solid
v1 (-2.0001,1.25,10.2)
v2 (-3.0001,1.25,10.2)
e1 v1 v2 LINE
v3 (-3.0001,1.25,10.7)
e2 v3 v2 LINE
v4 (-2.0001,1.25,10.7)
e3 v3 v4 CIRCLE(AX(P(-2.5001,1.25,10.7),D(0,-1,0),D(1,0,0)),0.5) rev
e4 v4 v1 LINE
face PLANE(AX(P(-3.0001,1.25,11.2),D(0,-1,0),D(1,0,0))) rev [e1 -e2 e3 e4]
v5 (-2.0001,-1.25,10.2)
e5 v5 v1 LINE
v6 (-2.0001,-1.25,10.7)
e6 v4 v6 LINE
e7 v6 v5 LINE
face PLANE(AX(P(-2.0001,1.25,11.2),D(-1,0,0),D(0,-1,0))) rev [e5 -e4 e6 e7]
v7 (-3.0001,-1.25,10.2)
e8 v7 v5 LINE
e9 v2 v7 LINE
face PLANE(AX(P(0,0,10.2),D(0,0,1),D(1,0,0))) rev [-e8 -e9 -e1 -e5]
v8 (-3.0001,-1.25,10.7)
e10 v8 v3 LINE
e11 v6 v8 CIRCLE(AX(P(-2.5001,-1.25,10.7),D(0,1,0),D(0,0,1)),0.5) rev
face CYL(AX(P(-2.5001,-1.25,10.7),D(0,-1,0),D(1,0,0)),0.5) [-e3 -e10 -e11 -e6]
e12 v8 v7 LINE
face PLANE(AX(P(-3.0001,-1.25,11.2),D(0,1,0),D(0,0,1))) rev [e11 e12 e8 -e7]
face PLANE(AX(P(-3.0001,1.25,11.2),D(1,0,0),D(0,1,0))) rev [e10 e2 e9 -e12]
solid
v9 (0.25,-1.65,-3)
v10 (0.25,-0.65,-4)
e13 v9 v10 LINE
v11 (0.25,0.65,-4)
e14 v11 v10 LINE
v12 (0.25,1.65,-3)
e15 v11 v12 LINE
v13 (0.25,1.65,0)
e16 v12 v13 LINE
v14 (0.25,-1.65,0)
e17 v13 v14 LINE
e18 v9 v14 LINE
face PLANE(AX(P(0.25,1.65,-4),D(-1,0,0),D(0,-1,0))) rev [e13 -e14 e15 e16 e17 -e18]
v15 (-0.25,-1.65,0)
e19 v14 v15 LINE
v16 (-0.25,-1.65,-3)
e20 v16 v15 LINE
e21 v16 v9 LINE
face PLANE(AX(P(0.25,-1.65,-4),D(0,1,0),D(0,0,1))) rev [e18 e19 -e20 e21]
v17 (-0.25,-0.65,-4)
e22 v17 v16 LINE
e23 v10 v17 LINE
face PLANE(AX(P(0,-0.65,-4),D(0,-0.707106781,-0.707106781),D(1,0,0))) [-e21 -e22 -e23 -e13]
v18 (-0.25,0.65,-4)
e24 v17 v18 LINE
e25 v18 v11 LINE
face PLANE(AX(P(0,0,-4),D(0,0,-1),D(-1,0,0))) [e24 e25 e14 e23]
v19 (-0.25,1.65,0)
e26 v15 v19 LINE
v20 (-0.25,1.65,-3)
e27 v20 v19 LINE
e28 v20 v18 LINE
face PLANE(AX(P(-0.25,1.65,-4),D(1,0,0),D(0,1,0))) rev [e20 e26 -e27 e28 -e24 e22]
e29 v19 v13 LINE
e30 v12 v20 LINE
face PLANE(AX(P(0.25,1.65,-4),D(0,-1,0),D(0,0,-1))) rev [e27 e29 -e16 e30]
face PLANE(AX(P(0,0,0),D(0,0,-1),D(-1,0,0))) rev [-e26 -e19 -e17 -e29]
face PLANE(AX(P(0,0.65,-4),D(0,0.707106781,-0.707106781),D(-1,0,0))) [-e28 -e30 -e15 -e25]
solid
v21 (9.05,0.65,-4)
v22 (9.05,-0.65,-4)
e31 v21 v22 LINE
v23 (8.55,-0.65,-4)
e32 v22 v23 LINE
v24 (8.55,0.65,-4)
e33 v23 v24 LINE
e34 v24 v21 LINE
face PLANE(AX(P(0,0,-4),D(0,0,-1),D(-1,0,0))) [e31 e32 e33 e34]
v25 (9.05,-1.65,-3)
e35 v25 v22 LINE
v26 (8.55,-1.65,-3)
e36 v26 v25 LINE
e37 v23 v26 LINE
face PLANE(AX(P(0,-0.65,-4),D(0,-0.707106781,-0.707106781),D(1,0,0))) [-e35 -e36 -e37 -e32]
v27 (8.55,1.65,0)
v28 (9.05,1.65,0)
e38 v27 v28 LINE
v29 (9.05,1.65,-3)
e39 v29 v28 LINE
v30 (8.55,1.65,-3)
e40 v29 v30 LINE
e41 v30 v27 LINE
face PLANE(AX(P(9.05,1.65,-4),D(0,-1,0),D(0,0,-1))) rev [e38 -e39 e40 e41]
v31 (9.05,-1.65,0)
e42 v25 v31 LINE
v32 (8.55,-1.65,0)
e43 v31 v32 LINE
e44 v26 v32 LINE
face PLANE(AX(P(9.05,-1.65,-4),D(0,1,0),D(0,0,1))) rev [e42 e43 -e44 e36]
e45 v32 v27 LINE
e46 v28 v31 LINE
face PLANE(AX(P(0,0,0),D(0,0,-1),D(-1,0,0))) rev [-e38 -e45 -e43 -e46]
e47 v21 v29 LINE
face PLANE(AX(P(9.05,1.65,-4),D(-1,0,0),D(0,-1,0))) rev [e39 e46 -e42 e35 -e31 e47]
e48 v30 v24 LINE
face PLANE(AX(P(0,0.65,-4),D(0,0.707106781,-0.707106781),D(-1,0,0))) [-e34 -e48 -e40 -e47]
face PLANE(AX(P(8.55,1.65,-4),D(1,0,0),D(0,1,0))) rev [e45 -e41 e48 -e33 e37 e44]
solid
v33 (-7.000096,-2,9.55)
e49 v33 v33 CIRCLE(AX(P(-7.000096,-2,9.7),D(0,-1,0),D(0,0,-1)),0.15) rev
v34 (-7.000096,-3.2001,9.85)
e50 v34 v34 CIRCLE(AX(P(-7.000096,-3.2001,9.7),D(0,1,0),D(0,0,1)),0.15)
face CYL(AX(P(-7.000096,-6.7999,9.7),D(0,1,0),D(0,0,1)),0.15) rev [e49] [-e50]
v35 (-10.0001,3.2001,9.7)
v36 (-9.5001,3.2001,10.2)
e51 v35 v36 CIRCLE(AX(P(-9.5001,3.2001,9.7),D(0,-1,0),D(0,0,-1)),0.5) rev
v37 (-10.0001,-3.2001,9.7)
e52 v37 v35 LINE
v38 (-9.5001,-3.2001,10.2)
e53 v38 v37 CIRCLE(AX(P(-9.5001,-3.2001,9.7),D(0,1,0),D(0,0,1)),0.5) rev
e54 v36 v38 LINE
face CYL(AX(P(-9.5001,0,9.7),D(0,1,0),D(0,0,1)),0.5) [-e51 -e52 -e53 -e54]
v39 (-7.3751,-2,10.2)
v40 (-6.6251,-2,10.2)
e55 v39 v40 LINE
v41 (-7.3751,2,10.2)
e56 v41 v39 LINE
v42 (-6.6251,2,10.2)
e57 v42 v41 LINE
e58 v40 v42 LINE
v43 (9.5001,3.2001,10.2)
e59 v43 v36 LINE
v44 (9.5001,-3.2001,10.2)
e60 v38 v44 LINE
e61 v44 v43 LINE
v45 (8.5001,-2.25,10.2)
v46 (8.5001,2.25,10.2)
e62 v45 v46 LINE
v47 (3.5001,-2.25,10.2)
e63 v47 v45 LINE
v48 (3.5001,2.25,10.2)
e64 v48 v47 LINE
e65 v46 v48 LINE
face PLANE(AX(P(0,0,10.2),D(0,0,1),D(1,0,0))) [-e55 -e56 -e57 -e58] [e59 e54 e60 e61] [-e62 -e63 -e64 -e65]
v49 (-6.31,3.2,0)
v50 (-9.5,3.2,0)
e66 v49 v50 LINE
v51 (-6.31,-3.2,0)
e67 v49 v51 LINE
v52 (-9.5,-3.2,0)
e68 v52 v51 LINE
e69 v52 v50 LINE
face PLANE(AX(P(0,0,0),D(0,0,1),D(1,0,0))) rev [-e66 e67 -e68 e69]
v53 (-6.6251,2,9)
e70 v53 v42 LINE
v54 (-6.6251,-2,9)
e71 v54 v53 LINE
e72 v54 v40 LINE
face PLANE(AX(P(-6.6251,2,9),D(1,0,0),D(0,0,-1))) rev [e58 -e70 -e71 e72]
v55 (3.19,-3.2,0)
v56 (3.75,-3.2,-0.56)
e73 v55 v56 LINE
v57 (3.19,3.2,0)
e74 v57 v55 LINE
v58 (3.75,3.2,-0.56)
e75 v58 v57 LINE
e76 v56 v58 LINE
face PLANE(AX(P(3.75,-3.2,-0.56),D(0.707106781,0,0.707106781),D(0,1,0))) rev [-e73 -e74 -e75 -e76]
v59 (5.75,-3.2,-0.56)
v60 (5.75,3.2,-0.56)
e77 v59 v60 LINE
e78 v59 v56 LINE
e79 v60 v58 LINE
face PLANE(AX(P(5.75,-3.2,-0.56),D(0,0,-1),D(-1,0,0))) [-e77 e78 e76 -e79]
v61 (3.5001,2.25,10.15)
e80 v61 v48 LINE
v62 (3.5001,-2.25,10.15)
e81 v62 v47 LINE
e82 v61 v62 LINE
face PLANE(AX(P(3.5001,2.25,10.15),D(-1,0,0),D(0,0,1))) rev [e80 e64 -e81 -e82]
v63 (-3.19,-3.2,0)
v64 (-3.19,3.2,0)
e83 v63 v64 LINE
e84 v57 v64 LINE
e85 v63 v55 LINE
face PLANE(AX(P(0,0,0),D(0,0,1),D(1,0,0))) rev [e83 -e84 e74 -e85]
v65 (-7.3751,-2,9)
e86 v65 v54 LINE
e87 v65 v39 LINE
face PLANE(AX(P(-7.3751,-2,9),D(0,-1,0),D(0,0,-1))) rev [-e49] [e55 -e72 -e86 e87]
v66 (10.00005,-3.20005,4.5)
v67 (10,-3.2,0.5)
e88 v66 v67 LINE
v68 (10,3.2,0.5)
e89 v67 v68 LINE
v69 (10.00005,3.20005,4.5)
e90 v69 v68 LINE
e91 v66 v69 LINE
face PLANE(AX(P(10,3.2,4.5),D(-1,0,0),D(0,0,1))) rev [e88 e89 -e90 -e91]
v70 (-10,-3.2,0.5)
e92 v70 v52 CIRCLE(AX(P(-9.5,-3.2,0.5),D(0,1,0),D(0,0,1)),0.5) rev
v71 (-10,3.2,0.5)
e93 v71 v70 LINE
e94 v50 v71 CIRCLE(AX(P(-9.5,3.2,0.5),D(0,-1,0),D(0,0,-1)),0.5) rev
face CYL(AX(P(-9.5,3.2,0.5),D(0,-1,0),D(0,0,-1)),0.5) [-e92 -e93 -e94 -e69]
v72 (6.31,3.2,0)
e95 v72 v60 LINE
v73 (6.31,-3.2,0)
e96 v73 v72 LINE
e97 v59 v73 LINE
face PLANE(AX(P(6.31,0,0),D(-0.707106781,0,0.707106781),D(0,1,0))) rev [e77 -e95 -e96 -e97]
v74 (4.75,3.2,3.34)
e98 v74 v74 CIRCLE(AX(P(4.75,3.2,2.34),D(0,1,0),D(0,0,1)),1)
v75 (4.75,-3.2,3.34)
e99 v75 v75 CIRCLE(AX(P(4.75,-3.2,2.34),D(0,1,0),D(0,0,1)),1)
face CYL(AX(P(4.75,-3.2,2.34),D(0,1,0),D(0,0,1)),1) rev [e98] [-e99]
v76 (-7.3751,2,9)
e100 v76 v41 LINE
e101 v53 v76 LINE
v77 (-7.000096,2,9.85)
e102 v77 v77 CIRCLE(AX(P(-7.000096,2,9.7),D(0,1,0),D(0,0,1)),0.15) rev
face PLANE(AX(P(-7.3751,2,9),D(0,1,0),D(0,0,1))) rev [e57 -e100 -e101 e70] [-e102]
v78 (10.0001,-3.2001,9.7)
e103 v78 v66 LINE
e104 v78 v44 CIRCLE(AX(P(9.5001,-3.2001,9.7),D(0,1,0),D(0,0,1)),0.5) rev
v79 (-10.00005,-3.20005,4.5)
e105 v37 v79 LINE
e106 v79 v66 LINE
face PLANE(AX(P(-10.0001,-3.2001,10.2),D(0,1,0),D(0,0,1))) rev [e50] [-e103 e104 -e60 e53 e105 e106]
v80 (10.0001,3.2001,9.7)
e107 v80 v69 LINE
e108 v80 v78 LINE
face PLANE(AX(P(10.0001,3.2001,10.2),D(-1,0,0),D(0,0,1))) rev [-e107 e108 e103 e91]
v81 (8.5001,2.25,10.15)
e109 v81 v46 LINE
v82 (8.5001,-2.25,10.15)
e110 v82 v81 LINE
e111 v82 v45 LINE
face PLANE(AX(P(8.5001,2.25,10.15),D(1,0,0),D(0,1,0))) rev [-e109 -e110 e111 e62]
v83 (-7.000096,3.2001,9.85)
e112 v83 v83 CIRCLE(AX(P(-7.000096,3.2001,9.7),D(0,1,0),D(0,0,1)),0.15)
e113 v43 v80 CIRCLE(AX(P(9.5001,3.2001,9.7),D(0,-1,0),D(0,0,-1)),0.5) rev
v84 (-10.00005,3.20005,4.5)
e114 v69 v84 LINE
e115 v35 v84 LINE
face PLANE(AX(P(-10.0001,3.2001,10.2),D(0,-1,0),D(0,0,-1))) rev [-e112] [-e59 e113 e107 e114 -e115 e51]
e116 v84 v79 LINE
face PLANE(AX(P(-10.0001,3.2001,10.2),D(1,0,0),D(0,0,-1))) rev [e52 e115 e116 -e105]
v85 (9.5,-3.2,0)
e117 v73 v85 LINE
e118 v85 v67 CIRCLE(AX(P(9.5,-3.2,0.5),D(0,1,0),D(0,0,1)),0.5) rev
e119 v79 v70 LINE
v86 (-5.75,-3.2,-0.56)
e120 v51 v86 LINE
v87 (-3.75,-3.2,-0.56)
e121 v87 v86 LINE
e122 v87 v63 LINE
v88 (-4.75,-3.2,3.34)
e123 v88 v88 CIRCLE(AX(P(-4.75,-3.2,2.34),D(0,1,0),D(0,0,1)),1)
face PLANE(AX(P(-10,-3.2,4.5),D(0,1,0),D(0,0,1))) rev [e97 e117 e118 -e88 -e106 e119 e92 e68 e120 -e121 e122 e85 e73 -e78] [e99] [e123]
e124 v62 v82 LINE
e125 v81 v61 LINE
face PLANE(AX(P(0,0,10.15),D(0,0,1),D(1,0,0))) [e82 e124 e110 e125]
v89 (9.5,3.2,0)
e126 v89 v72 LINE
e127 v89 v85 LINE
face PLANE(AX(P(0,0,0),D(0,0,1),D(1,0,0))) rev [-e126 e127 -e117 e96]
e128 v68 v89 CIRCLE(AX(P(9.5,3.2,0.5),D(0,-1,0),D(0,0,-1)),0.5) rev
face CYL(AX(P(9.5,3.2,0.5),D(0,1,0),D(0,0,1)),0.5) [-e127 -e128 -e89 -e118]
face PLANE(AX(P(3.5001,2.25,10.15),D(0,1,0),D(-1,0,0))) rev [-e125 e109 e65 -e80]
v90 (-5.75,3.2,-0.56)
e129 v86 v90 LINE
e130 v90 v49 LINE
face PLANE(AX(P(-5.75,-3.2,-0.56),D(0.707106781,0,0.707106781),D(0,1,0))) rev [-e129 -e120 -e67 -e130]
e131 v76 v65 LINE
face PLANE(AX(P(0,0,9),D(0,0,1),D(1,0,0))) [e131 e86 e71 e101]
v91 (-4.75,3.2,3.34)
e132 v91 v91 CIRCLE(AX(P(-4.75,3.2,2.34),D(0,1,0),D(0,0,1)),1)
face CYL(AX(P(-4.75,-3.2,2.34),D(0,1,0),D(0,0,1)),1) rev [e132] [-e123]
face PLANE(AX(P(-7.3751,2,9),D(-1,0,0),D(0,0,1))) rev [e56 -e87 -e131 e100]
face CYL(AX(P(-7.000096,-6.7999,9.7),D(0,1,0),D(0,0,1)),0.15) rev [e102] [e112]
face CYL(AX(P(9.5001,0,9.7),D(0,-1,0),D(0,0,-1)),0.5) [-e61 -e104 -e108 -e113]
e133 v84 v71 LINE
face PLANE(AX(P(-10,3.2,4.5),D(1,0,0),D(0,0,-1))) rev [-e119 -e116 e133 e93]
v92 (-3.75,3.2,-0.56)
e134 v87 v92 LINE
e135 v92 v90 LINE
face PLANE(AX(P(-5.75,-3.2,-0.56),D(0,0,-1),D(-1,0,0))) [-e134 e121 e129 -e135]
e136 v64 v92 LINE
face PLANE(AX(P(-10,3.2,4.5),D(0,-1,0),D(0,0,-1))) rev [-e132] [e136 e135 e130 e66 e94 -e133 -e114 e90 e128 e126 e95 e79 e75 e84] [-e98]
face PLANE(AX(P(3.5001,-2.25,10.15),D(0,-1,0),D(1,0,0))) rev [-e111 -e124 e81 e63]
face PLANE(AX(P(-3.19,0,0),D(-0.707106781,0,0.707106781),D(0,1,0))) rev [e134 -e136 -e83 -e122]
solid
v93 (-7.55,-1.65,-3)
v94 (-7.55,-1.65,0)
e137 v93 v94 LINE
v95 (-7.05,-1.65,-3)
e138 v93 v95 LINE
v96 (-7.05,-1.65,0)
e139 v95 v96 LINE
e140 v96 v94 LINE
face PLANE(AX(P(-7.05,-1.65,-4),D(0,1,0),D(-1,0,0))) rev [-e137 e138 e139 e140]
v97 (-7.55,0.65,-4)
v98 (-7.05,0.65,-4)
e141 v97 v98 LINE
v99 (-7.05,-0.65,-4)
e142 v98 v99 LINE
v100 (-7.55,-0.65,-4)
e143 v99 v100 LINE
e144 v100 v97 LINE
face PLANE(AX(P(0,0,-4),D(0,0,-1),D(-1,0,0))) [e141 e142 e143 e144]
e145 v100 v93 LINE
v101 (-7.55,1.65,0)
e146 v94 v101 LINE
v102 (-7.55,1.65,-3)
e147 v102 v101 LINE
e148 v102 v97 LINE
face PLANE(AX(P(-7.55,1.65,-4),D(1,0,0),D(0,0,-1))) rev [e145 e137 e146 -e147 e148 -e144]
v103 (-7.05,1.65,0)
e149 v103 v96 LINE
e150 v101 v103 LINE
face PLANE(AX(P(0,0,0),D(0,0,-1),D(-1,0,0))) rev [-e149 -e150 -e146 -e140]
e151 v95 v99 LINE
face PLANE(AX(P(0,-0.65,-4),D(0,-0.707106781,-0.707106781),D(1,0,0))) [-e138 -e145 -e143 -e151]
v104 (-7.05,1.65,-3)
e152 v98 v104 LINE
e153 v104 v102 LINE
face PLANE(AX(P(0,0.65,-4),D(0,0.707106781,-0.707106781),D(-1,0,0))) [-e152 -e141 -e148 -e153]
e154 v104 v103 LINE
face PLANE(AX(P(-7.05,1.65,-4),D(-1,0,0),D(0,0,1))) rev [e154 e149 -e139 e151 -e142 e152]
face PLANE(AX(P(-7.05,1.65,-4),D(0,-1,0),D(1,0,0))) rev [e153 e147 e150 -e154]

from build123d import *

# Parameters (mm, degrees)
BASE_SKETCH_W               = 20
BASE_SKETCH_H               = 6.4
BASE_EXTRUDE_DEPTH          = 4.5
CONTACTS_SKETCH_W           = 0.5
CONTACTS_SKETCH_H           = 3.3
CONTACTS_EXTRUDE_DEPTH      = 4
CONTACTS_EXTRUDE_2_DEPTH    = 4
CONTACTS_EXTRUDE_3_DEPTH    = 4
CONTACT_1_CHAMFER_SIZE      = 1
CHAMFER1_SIZE               = 1
CHAMFER2_SIZE               = 1
MOUNTING_HOLES_SKETCH_R     = 1
CUT_MOUNTING_HOLES_DEPTH    = 6.4
BOTTOM_PROTRUSIONS_SKETCH_W = 2
BOTTOM_PROTRUSIONS_SKETCH_H = 0.56
BOTTOM_PROTRUSIONS_DEPTH    = 6.4
CHAMFER_PROTRUSIONS_SIZE    = 0.56
TOP_SKETCH_W                = 20.0002
TOP_SKETCH_H                = 6.4002
TOP_EXTRUDE_DEPTH           = 5.7
BUTTON_SKETCH_W             = 1
BUTTON_SKETCH_H             = 2.5
BUTTON_EXTRUDE_DEPTH        = 1
BUTTON_FILLET_RADIUS        = 0.5
BUTTON_FILLET_LENGTH        = 2.5
TOP_INDENT_SKETCH_W         = 5
TOP_INDENT_SKETCH_H         = 4.5
TOP_INDENT_CUT_DEPTH        = 0.05
PIVOT_HOLE_SKETCH_R         = 0.15
LEVER_PIVOT_HOLE_CUT_DEPTH  = 10
LEVER_RECESS_SKETCH_W       = 0.75
LEVER_RECESS_SKETCH_H       = 4
LEVER_RECESS_CUT_DEPTH      = 1.2
CORNER_FILLET_R             = 0.5


with BuildPart() as part:
    # Base Sketch → Base Extrude (new body)
    with BuildSketch(Plane.XY):
        Rectangle(BASE_SKETCH_W, BASE_SKETCH_H)
    extrude(amount=BASE_EXTRUDE_DEPTH)

    # Mounting Holes Sketch → Cut Mounting Holes (cut)
    with BuildSketch(Plane(origin=(0, 3.2, 0), x_dir=(1, 0, 0), z_dir=(0, 1, 0))):
        with Locations(Location((-4.75, -2.34, 0), (0, 0, 270))):
            Circle(MOUNTING_HOLES_SKETCH_R)
        with Locations(Location((4.75, -2.34, 0), (0, 0, 270))):
            Circle(MOUNTING_HOLES_SKETCH_R)
    extrude(amount=-CUT_MOUNTING_HOLES_DEPTH, mode=Mode.SUBTRACT)

    # Bottom Protrusions Sketch → Bottom Protrusions (add)
    with BuildSketch(Plane(origin=(0, 3.2, 0), x_dir=(1, 0, 0), z_dir=(0, 1, 0))):
        with Locations((-4.75, 0.28)):
            Rectangle(BOTTOM_PROTRUSIONS_SKETCH_W, BOTTOM_PROTRUSIONS_SKETCH_H)
        with Locations((4.75, 0.28)):
            Rectangle(BOTTOM_PROTRUSIONS_SKETCH_W, BOTTOM_PROTRUSIONS_SKETCH_H)
    extrude(amount=-BOTTOM_PROTRUSIONS_DEPTH)

    # Chamfer Protrusions
    chamfer_protrusions_edges = [part.edges().sort_by_distance(p)[0] for p in [
        (5.75, 0, 0),
        (3.75, 0, 0),
        (-3.75, 0, 0),
        (-5.75, 0, 0),
    ]]
    chamfer(chamfer_protrusions_edges, length=CHAMFER_PROTRUSIONS_SIZE - 0.0001)  # a hair under: the kernel refuses the full size

    # Top Sketch → Top Extrude (add)
    with BuildSketch(Plane.XY.offset(4.5)):
        Rectangle(TOP_SKETCH_W, TOP_SKETCH_H)
    extrude(amount=TOP_EXTRUDE_DEPTH)

    # Top Indent Sketch → Top Indent Cut (cut)
    with BuildSketch(Plane.XY.offset(10.2)):
        with Locations((6.0001, 0)):
            Rectangle(TOP_INDENT_SKETCH_W, TOP_INDENT_SKETCH_H)
    extrude(amount=-TOP_INDENT_CUT_DEPTH, mode=Mode.SUBTRACT)

    # Pivot Hole Sketch → Lever Pivot Hole Cut (cut)
    with BuildSketch(Plane(origin=(0, 3.2001, 0), x_dir=(1, 0, 0), z_dir=(0, 1, 0))):
        with Locations(Location((-7.000095614, -9.7, 0), (0, 0, 270))):
            Circle(PIVOT_HOLE_SKETCH_R)
    extrude(amount=-LEVER_PIVOT_HOLE_CUT_DEPTH, mode=Mode.SUBTRACT)

    # Lever Recess Sketch → Lever Recess Cut (cut)
    with BuildSketch(Plane.XY.offset(10.2)):
        with Locations((-7.0001, 0)):
            Rectangle(LEVER_RECESS_SKETCH_W, LEVER_RECESS_SKETCH_H)
    extrude(amount=-LEVER_RECESS_CUT_DEPTH, mode=Mode.SUBTRACT)

    # Corner Fillet
    corner_fillet_edges = [part.edges().sort_by_distance(p)[0] for p in [
        (10.0001, 0, 10.2),
        (-10.0001, 0, 10.2),
        (-10, 0, 0),
        (10, 0, 0),
    ]]
    fillet(corner_fillet_edges, radius=CORNER_FILLET_R)


with BuildPart() as body_2:
    # Contacts Sketch → Contacts Extrude (new body)
    with BuildSketch(Plane(origin=(0, 0, 0), x_dir=(-1, 0, 0), z_dir=(0, 0, -1))):
        Rectangle(CONTACTS_SKETCH_W, CONTACTS_SKETCH_H)
    extrude(amount=CONTACTS_EXTRUDE_DEPTH)

    # Chamfer1
    chamfer1_edges = [body_2.edges().sort_by_distance(p)[0] for p in [
        (0, -1.65, -4),
        (0, 1.65, -4),
    ]]
    chamfer(chamfer1_edges, length=CHAMFER1_SIZE)


with BuildPart() as body_3:
    # Contacts Sketch → Contacts Extrude 2 (new body)
    with BuildSketch(Plane(origin=(0, 0, 0), x_dir=(-1, 0, 0), z_dir=(0, 0, -1))):
        with Locations((-8.8, 0)):
            Rectangle(CONTACTS_SKETCH_W, CONTACTS_SKETCH_H)
    extrude(amount=CONTACTS_EXTRUDE_2_DEPTH)

    # Chamfer2
    chamfer2_edges = [body_3.edges().sort_by_distance(p)[0] for p in [
        (8.8, -1.65, -4),
        (8.8, 1.65, -4),
    ]]
    chamfer(chamfer2_edges, length=CHAMFER2_SIZE)


with BuildPart() as body_4:
    # Contacts Sketch → Contacts Extrude 3 (new body)
    with BuildSketch(Plane(origin=(0, 0, 0), x_dir=(-1, 0, 0), z_dir=(0, 0, -1))):
        with Locations((7.3, 0)):
            Rectangle(CONTACTS_SKETCH_W, CONTACTS_SKETCH_H)
    extrude(amount=CONTACTS_EXTRUDE_3_DEPTH)

    # Contact 1 Chamfer
    contact_1_chamfer_edges = [body_4.edges().sort_by_distance(p)[0] for p in [
        (-7.3, -1.65, -4),
        (-7.3, 1.65, -4),
    ]]
    chamfer(contact_1_chamfer_edges, length=CONTACT_1_CHAMFER_SIZE)


with BuildPart() as body_5:
    # Button Sketch → Button Extrude (new body)
    with BuildSketch(Plane.XY.offset(10.2)):
        with Locations((-2.5001, 0)):
            Rectangle(BUTTON_SKETCH_W, BUTTON_SKETCH_H)
    extrude(amount=BUTTON_EXTRUDE_DEPTH)

    # Button Fillet: full round fillet: the end face becomes a half cylinder, R = half its width
    button_fillet_face = Plane((-2.5001, 0, 11.2), x_dir=(0, 1, 0), z_dir=(0, 0, 1))  # on the end face: x along it, z out of the body
    button_fillet_slab = button_fillet_face.offset(-BUTTON_FILLET_RADIUS / 2) * Box(BUTTON_FILLET_LENGTH, 2 * BUTTON_FILLET_RADIUS, BUTTON_FILLET_RADIUS, mode=Mode.PRIVATE)  # the body's end, R deep
    button_fillet_round = Plane((-2.5001, 0, 10.7), x_dir=(0, 0, 1), z_dir=(0, 1, 0)) * Cylinder(BUTTON_FILLET_RADIUS, BUTTON_FILLET_LENGTH, mode=Mode.PRIVATE)  # its axis R under the face
    add(button_fillet_slab - button_fillet_round, mode=Mode.SUBTRACT)


solid = Compound([part.part, body_2.part, body_3.part, body_4.part, body_5.part])
